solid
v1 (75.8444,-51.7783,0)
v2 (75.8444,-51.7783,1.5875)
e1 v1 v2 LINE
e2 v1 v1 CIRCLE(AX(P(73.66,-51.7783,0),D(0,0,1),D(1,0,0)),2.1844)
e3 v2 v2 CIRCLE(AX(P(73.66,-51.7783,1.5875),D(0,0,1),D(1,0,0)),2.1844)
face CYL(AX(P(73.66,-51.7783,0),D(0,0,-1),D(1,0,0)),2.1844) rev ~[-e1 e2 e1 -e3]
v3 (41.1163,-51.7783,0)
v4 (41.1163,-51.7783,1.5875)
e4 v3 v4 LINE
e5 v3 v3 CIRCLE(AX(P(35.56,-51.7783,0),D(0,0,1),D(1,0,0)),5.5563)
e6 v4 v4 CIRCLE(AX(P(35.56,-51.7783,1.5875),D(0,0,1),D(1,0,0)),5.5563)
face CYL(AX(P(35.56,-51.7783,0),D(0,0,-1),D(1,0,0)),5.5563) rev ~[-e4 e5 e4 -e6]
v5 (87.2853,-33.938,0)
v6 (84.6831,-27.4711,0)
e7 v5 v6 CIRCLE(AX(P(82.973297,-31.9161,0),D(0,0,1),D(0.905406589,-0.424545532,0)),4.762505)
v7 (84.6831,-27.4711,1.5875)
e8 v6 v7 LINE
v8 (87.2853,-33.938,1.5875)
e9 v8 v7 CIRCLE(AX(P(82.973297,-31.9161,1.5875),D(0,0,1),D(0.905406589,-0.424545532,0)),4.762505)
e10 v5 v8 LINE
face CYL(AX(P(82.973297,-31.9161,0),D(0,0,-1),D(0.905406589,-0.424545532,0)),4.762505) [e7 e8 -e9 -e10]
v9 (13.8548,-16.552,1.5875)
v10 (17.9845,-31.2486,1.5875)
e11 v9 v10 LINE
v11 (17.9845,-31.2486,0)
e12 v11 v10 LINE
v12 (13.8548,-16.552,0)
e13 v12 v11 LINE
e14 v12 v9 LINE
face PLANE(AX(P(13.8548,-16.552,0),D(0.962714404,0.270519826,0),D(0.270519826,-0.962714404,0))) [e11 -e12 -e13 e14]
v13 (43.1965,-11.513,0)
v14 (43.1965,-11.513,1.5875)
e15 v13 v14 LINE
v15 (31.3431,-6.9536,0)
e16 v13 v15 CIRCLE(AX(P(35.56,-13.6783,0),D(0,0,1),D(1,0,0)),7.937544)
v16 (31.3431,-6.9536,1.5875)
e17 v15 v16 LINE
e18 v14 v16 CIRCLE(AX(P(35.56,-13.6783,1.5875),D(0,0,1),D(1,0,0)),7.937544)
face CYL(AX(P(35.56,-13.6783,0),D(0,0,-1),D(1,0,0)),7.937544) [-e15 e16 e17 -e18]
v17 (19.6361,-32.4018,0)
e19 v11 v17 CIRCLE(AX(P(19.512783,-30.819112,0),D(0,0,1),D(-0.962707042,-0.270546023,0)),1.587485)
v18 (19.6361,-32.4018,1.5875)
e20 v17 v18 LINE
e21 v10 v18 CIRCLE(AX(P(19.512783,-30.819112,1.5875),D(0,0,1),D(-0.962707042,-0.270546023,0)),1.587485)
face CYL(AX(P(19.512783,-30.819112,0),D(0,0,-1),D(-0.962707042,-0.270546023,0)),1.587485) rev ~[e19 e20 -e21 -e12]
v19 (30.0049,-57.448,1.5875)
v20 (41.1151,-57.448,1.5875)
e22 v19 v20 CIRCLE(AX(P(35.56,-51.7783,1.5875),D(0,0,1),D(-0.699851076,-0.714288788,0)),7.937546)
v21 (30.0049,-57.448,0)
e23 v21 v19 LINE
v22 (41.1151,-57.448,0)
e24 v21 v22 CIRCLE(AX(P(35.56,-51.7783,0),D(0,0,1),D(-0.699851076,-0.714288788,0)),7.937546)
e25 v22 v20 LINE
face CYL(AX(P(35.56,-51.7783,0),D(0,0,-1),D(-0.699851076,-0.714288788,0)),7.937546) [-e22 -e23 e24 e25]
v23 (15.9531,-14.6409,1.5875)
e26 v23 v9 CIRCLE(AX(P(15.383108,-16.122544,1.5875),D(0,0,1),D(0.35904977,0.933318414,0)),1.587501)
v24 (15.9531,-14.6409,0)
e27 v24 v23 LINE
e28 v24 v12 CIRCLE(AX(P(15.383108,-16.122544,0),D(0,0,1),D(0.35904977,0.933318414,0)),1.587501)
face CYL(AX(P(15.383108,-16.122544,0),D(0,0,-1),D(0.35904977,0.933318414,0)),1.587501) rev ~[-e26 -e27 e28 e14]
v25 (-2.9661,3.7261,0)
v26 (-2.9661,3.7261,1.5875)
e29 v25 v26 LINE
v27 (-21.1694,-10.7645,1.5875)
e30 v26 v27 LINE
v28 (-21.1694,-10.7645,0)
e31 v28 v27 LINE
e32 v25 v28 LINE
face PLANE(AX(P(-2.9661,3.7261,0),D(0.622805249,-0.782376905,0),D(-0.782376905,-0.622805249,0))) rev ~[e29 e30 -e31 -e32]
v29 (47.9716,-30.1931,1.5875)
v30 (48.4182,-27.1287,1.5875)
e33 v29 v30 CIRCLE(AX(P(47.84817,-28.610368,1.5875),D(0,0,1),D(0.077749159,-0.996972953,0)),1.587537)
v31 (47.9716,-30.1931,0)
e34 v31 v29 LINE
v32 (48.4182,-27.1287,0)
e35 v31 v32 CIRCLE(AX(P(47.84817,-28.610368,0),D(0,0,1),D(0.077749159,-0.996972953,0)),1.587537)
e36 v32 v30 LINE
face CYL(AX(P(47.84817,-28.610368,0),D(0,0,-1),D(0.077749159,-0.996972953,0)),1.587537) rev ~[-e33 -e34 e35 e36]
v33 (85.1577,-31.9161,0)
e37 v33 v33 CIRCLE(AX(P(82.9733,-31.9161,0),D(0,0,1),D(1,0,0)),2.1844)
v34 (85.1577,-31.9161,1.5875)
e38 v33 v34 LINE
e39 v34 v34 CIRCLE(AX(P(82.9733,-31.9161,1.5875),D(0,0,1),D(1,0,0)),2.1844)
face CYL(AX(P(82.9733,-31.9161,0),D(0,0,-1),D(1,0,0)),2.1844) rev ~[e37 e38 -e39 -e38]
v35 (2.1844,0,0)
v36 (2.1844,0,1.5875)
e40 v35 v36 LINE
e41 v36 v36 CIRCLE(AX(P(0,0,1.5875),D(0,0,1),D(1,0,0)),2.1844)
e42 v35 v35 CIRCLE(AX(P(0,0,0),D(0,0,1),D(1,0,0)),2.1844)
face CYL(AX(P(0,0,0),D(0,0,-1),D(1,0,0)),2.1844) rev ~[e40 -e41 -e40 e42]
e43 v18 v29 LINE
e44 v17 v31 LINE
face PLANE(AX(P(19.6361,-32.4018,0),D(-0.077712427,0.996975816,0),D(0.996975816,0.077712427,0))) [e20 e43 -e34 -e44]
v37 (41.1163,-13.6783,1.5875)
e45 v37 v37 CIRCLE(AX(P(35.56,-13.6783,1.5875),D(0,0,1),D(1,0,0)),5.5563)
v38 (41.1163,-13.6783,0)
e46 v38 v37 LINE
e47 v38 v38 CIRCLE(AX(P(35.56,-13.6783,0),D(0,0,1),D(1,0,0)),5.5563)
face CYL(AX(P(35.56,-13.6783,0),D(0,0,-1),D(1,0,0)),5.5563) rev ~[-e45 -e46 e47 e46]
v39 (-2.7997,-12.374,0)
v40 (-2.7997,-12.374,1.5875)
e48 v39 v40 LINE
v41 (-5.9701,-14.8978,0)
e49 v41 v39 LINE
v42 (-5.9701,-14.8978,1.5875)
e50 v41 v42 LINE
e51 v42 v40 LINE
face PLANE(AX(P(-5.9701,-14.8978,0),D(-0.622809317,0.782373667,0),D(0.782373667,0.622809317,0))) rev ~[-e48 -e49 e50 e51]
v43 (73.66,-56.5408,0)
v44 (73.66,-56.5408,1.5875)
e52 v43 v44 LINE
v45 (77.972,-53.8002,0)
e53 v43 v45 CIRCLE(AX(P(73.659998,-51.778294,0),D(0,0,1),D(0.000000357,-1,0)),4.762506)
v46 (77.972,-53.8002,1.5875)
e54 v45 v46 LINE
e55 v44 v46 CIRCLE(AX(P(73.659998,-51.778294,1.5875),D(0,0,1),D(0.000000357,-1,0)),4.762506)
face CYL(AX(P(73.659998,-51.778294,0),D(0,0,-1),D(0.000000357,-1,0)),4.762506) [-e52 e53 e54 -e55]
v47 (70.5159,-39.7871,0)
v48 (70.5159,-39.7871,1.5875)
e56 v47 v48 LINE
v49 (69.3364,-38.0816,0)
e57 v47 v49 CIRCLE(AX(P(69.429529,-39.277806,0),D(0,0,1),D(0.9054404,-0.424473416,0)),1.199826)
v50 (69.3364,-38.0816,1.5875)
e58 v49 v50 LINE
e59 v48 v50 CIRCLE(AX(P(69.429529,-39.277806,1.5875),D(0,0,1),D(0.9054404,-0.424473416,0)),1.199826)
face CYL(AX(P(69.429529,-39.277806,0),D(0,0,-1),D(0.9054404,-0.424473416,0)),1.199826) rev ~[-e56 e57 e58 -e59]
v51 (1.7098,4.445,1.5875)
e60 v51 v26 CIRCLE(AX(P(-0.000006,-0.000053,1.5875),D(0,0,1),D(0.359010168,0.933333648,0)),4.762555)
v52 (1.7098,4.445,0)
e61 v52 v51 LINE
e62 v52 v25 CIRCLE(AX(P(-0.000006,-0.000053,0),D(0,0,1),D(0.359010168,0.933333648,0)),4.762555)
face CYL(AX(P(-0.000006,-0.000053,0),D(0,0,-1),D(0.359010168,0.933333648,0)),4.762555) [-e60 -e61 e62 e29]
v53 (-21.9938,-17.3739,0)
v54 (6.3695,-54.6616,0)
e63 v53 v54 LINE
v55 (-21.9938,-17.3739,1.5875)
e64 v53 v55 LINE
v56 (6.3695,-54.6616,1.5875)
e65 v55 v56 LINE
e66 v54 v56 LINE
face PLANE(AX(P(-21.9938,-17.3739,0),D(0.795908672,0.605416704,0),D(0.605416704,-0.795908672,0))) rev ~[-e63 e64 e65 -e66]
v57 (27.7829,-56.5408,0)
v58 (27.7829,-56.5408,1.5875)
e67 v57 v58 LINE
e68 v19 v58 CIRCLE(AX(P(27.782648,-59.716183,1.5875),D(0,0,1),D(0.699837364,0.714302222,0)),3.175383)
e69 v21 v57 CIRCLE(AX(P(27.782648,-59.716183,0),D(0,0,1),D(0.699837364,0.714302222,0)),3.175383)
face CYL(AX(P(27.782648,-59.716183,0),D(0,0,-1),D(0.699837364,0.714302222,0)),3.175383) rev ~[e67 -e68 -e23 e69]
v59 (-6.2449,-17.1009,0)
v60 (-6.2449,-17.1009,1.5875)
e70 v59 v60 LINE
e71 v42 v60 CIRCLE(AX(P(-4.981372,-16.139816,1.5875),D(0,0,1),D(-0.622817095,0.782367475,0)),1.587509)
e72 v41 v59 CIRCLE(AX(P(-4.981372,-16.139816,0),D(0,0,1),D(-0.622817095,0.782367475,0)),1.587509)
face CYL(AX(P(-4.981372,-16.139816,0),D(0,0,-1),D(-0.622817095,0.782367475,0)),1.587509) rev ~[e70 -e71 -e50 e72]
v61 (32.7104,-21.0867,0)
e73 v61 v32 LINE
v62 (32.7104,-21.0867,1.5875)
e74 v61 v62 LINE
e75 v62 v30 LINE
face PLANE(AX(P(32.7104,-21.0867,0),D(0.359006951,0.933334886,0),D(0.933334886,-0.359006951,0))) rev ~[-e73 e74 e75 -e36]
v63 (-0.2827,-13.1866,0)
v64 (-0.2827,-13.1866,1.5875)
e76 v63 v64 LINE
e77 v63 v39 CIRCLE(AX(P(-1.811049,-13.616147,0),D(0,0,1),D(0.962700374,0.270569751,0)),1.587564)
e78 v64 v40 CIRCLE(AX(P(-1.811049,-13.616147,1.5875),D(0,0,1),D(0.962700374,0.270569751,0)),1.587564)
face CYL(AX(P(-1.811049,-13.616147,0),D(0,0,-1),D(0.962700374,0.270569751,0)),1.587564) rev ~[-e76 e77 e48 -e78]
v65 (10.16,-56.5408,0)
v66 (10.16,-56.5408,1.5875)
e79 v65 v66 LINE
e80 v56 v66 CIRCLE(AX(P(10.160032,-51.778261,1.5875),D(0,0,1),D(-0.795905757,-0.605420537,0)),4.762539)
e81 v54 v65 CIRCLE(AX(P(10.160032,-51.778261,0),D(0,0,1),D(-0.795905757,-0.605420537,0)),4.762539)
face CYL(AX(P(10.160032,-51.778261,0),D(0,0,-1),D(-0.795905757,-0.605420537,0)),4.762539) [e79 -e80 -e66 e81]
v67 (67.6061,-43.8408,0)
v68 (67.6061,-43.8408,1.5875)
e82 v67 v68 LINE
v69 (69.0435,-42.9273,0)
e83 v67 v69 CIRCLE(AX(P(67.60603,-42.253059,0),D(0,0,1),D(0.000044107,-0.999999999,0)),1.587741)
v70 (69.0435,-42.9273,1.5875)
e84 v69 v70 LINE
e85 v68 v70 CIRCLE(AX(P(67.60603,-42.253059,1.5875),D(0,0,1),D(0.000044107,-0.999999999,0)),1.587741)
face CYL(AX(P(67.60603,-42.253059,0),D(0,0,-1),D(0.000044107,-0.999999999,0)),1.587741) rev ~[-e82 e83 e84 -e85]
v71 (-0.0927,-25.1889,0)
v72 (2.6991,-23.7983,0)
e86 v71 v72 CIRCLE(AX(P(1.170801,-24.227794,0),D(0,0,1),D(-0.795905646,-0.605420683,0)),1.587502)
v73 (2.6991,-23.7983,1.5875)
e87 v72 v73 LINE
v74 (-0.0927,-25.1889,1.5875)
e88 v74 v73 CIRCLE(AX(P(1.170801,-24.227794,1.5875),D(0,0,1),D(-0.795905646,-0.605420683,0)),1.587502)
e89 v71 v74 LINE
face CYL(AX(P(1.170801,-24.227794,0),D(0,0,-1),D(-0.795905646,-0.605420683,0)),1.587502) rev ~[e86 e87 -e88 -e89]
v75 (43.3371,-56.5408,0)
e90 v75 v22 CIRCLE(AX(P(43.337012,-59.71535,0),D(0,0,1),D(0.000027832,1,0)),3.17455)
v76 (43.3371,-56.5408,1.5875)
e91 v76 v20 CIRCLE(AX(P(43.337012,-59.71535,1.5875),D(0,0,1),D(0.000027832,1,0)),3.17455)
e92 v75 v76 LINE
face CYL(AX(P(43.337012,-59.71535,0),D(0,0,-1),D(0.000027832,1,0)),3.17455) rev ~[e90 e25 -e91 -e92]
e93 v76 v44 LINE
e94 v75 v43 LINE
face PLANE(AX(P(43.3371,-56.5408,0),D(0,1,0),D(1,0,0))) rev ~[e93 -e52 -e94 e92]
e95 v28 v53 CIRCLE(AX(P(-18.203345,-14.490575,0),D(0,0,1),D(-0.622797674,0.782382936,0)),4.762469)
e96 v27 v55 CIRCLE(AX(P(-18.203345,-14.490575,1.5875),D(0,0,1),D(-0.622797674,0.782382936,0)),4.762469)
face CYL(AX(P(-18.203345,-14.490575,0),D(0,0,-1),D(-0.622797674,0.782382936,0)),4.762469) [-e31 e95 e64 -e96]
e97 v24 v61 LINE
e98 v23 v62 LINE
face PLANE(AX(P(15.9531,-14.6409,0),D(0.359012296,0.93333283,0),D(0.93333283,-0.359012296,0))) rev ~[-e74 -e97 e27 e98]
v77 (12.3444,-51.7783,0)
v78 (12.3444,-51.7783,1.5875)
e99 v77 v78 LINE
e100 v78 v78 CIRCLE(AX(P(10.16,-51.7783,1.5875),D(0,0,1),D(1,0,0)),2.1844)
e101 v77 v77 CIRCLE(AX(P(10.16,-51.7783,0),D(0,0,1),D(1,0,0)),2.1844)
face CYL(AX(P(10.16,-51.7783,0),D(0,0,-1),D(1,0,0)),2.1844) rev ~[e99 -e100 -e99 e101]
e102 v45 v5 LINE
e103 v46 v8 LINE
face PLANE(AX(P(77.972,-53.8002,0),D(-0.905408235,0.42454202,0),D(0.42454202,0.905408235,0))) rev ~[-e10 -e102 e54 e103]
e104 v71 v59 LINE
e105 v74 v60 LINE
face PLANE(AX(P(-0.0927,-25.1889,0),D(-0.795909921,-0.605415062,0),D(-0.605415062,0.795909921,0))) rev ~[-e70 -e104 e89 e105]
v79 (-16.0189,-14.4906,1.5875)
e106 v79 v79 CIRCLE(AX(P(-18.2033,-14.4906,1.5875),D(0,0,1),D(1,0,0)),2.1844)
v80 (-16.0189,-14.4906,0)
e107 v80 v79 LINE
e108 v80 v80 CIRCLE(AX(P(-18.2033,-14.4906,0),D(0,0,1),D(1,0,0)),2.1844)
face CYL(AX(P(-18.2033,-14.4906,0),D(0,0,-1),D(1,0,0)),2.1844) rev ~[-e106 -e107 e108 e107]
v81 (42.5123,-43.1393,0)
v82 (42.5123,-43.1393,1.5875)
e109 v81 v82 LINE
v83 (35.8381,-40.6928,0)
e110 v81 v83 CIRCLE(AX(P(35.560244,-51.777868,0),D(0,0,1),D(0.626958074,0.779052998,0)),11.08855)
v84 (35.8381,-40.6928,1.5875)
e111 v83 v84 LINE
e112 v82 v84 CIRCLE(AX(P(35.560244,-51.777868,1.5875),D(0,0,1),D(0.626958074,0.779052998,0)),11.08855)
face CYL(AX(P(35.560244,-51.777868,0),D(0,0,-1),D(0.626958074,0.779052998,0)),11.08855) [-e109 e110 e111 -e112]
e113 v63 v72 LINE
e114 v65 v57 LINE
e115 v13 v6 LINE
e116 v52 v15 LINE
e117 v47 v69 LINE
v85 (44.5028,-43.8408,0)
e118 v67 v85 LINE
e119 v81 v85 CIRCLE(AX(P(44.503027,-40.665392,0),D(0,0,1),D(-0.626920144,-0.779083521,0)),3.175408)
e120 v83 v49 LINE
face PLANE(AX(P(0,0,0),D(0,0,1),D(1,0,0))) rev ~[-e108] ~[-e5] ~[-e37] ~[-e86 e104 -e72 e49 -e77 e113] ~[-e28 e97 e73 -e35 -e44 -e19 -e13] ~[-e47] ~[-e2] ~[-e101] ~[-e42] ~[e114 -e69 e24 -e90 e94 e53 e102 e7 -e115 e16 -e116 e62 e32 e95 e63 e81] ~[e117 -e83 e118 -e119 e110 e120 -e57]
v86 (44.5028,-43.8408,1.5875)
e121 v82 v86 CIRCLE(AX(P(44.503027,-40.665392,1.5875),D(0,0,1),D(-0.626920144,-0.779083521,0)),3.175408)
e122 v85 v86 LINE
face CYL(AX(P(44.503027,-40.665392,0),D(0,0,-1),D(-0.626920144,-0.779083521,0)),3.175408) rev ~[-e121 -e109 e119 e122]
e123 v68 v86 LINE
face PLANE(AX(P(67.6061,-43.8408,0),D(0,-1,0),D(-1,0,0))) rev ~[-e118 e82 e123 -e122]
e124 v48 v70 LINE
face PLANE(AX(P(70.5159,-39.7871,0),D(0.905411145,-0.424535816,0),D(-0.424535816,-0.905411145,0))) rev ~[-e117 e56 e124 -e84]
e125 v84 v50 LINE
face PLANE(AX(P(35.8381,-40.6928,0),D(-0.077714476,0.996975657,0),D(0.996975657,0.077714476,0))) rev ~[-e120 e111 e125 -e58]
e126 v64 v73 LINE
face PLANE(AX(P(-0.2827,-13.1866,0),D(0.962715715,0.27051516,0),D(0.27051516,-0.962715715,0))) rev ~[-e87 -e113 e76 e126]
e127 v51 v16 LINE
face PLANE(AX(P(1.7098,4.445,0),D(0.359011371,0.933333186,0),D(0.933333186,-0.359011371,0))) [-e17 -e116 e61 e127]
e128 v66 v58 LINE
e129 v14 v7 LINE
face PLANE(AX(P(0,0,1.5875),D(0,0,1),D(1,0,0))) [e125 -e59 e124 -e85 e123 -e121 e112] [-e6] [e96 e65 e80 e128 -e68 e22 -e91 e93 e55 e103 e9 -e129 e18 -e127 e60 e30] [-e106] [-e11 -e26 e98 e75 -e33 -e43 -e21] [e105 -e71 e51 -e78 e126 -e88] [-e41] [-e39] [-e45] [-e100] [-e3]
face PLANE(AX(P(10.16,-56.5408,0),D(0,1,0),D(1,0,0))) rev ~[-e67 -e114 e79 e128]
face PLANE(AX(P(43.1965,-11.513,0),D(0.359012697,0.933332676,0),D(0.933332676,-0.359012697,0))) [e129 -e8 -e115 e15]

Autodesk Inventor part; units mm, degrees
ref_plane "YZ Plane" through (0, 0, 0) normal (1, 0, 0) x (0, 1, 0)
ref_plane "XZ Plane" through (0, 0, 0) normal (0, 1, 0) x (-1, 0, 0)
ref_plane "XY Plane" through (0, 0, 0) normal (0, 0, 1) x (1, 0, 0)
sketch "main" plane through (0, 0, 0) normal (0, 0, 1) x (1, 0, 0)
  circle A0 centre (36.5381, -21.0803) radius 2.1844
  circle A1 centre (-26.9619, -21.0803) radius 2.1844
  circle A2 centre (-37.1219, 30.698) radius 2.1844
  circle A3 centre (45.8515, -1.2181) radius 2.1844
  circle A4 centre (-55.3252, 16.2075) radius 2.1844
  point P0 (-7.4039, 0.7054)
sketch "Sketch1" plane through (0, 0, 0) normal (0, 0, 1) x (1, 0, 0)
  arc A0 (-21.1694, -10.7645) -> (-21.9938, -17.3739) centre (-18.2033, -14.4906) ccw
  arc A1 (1.7098, 4.445) -> (-2.9661, 3.7261) centre (0, 0) ccw
  arc A2 (6.3695, -54.6616) -> (10.16, -56.5408) centre (10.16, -51.7783) ccw
  arc A3 (73.66, -56.5408) -> (77.972, -53.8002) centre (73.66, -51.7783) ccw
  arc A4 (87.2853, -33.938) -> (84.6831, -27.4711) centre (82.9733, -31.9161) ccw
  line L0 (77.972, -53.8002) -> (87.2853, -33.938)
  line L1 (-2.9661, 3.7261) -> (-21.1694, -10.7645)
  line L2 (-21.9938, -17.3739) -> (6.3695, -54.6616)
  line L3 (-5.9701, -14.8978) -> (-2.7997, -12.374)
  line L4 (70.5159, -39.7871) -> (69.0435, -42.9273)
  line L5 (67.6061, -43.8408) -> (44.5028, -43.8408)
  line L6 (-0.0927, -25.1889) -> (-6.2449, -17.1009)
  line L7 (-0.2827, -13.1866) -> (2.6991, -23.7983)
  line L8 (13.8548, -16.552) -> (17.9845, -31.2486)
  line L9 (35.8381, -40.6928) -> (69.3364, -38.0816)
  line L10 (19.6361, -32.4018) -> (47.9716, -30.1931)
  arc A5 (-0.2827, -13.1866) -> (-2.7997, -12.374) centre (-1.811, -13.6161) ccw
  arc A6 (-5.9701, -14.8978) -> (-6.2449, -17.1009) centre (-4.9814, -16.1398) ccw
  arc A7 (-0.0927, -25.1889) -> (2.6991, -23.7983) centre (1.1708, -24.2278) ccw
  arc A8 (15.9531, -14.6409) -> (13.8548, -16.552) centre (15.3831, -16.1225) ccw
  arc A9 (17.9845, -31.2486) -> (19.6361, -32.4018) centre (19.5128, -30.8191) ccw
  arc A10 (47.9716, -30.1931) -> (48.4182, -27.1287) centre (47.8482, -28.6104) ccw
  arc A11 (67.6061, -43.8408) -> (69.0435, -42.9273) centre (67.6061, -42.2533) ccw
  arc A12 (70.5159, -39.7871) -> (69.3364, -38.0816) centre (69.4296, -39.2778) ccw
  circle A13 centre (35.56, -51.7783) radius 5.5563
  line L11 (10.16, -56.5408) -> (27.7829, -56.5408)
  line L12 (43.3371, -56.5408) -> (73.66, -56.5408)
  arc A14 (30.0049, -57.448) -> (41.1151, -57.448) centre (35.56, -51.7783) ccw
  arc A15 (42.5123, -43.1393) -> (35.8381, -40.6928) centre (35.56, -51.7783) ccw
  arc A16 (30.0049, -57.448) -> (27.7829, -56.5408) centre (27.7829, -59.7158) ccw
  arc A17 (43.3371, -56.5408) -> (41.1151, -57.448) centre (43.3371, -59.7158) ccw
  arc A18 (42.5123, -43.1393) -> (44.5028, -43.8408) centre (44.5028, -40.6658) ccw
  circle A19 centre (35.56, -13.6783) radius 5.5563
  line L13 (1.7098, 4.445) -> (31.3431, -6.9536)
  line L14 (43.1965, -11.513) -> (84.6831, -27.4711)
  arc A20 (32.7104, -21.0867) -> (32.7104, -21.0867) centre (35.56, -13.6783) ccw
  arc A21 (43.1965, -11.513) -> (31.3431, -6.9536) centre (35.56, -13.6783) ccw
  line L15 (15.9531, -14.6409) -> (32.7104, -21.0867)
  line L16 (32.7104, -21.0867) -> (48.4182, -27.1287)
  circle A22 centre (73.66, -51.7783) radius 2.1844
  circle A23 centre (10.16, -51.7783) radius 2.1844
  circle A24 centre (0, 0) radius 2.1844
  circle A25 centre (82.9733, -31.9161) radius 2.1844
  circle A26 centre (-18.2033, -14.4906) radius 2.1844
  point P0 (0, 0)
  point P1 (17.1709, -28.3531)
  point P2 (29.21, -56.5408)
  point P3 (41.91, -56.5408)
  point P4 (43.3035, -43.8408)
  dimension "d0" = 9.525
  dimension "d1" = 9.525
  dimension "d2" = 9.525
  dimension "d3" = 9.525
  dimension "d4" = 9.525
  dimension "d5" = 12.7
  dimension "d7" = 9.525
  dimension "d8" = 1.5875
  dimension "d9" = 1.5875
  dimension "d13" = 11.1125
  dimension "d16" = 3.175
  dimension "d18" = 11.1125
  dimension "d20" = 12.7
  dimension "d21" = 12.7
  dimension "d22" = 12.7
  dimension "d23" = 12.7
extrude "Extrusion1" add sketch "Sketch1" along normal blind 1.5875
properties part number "gearbox_gusset" material "Acetal Resin, White"
